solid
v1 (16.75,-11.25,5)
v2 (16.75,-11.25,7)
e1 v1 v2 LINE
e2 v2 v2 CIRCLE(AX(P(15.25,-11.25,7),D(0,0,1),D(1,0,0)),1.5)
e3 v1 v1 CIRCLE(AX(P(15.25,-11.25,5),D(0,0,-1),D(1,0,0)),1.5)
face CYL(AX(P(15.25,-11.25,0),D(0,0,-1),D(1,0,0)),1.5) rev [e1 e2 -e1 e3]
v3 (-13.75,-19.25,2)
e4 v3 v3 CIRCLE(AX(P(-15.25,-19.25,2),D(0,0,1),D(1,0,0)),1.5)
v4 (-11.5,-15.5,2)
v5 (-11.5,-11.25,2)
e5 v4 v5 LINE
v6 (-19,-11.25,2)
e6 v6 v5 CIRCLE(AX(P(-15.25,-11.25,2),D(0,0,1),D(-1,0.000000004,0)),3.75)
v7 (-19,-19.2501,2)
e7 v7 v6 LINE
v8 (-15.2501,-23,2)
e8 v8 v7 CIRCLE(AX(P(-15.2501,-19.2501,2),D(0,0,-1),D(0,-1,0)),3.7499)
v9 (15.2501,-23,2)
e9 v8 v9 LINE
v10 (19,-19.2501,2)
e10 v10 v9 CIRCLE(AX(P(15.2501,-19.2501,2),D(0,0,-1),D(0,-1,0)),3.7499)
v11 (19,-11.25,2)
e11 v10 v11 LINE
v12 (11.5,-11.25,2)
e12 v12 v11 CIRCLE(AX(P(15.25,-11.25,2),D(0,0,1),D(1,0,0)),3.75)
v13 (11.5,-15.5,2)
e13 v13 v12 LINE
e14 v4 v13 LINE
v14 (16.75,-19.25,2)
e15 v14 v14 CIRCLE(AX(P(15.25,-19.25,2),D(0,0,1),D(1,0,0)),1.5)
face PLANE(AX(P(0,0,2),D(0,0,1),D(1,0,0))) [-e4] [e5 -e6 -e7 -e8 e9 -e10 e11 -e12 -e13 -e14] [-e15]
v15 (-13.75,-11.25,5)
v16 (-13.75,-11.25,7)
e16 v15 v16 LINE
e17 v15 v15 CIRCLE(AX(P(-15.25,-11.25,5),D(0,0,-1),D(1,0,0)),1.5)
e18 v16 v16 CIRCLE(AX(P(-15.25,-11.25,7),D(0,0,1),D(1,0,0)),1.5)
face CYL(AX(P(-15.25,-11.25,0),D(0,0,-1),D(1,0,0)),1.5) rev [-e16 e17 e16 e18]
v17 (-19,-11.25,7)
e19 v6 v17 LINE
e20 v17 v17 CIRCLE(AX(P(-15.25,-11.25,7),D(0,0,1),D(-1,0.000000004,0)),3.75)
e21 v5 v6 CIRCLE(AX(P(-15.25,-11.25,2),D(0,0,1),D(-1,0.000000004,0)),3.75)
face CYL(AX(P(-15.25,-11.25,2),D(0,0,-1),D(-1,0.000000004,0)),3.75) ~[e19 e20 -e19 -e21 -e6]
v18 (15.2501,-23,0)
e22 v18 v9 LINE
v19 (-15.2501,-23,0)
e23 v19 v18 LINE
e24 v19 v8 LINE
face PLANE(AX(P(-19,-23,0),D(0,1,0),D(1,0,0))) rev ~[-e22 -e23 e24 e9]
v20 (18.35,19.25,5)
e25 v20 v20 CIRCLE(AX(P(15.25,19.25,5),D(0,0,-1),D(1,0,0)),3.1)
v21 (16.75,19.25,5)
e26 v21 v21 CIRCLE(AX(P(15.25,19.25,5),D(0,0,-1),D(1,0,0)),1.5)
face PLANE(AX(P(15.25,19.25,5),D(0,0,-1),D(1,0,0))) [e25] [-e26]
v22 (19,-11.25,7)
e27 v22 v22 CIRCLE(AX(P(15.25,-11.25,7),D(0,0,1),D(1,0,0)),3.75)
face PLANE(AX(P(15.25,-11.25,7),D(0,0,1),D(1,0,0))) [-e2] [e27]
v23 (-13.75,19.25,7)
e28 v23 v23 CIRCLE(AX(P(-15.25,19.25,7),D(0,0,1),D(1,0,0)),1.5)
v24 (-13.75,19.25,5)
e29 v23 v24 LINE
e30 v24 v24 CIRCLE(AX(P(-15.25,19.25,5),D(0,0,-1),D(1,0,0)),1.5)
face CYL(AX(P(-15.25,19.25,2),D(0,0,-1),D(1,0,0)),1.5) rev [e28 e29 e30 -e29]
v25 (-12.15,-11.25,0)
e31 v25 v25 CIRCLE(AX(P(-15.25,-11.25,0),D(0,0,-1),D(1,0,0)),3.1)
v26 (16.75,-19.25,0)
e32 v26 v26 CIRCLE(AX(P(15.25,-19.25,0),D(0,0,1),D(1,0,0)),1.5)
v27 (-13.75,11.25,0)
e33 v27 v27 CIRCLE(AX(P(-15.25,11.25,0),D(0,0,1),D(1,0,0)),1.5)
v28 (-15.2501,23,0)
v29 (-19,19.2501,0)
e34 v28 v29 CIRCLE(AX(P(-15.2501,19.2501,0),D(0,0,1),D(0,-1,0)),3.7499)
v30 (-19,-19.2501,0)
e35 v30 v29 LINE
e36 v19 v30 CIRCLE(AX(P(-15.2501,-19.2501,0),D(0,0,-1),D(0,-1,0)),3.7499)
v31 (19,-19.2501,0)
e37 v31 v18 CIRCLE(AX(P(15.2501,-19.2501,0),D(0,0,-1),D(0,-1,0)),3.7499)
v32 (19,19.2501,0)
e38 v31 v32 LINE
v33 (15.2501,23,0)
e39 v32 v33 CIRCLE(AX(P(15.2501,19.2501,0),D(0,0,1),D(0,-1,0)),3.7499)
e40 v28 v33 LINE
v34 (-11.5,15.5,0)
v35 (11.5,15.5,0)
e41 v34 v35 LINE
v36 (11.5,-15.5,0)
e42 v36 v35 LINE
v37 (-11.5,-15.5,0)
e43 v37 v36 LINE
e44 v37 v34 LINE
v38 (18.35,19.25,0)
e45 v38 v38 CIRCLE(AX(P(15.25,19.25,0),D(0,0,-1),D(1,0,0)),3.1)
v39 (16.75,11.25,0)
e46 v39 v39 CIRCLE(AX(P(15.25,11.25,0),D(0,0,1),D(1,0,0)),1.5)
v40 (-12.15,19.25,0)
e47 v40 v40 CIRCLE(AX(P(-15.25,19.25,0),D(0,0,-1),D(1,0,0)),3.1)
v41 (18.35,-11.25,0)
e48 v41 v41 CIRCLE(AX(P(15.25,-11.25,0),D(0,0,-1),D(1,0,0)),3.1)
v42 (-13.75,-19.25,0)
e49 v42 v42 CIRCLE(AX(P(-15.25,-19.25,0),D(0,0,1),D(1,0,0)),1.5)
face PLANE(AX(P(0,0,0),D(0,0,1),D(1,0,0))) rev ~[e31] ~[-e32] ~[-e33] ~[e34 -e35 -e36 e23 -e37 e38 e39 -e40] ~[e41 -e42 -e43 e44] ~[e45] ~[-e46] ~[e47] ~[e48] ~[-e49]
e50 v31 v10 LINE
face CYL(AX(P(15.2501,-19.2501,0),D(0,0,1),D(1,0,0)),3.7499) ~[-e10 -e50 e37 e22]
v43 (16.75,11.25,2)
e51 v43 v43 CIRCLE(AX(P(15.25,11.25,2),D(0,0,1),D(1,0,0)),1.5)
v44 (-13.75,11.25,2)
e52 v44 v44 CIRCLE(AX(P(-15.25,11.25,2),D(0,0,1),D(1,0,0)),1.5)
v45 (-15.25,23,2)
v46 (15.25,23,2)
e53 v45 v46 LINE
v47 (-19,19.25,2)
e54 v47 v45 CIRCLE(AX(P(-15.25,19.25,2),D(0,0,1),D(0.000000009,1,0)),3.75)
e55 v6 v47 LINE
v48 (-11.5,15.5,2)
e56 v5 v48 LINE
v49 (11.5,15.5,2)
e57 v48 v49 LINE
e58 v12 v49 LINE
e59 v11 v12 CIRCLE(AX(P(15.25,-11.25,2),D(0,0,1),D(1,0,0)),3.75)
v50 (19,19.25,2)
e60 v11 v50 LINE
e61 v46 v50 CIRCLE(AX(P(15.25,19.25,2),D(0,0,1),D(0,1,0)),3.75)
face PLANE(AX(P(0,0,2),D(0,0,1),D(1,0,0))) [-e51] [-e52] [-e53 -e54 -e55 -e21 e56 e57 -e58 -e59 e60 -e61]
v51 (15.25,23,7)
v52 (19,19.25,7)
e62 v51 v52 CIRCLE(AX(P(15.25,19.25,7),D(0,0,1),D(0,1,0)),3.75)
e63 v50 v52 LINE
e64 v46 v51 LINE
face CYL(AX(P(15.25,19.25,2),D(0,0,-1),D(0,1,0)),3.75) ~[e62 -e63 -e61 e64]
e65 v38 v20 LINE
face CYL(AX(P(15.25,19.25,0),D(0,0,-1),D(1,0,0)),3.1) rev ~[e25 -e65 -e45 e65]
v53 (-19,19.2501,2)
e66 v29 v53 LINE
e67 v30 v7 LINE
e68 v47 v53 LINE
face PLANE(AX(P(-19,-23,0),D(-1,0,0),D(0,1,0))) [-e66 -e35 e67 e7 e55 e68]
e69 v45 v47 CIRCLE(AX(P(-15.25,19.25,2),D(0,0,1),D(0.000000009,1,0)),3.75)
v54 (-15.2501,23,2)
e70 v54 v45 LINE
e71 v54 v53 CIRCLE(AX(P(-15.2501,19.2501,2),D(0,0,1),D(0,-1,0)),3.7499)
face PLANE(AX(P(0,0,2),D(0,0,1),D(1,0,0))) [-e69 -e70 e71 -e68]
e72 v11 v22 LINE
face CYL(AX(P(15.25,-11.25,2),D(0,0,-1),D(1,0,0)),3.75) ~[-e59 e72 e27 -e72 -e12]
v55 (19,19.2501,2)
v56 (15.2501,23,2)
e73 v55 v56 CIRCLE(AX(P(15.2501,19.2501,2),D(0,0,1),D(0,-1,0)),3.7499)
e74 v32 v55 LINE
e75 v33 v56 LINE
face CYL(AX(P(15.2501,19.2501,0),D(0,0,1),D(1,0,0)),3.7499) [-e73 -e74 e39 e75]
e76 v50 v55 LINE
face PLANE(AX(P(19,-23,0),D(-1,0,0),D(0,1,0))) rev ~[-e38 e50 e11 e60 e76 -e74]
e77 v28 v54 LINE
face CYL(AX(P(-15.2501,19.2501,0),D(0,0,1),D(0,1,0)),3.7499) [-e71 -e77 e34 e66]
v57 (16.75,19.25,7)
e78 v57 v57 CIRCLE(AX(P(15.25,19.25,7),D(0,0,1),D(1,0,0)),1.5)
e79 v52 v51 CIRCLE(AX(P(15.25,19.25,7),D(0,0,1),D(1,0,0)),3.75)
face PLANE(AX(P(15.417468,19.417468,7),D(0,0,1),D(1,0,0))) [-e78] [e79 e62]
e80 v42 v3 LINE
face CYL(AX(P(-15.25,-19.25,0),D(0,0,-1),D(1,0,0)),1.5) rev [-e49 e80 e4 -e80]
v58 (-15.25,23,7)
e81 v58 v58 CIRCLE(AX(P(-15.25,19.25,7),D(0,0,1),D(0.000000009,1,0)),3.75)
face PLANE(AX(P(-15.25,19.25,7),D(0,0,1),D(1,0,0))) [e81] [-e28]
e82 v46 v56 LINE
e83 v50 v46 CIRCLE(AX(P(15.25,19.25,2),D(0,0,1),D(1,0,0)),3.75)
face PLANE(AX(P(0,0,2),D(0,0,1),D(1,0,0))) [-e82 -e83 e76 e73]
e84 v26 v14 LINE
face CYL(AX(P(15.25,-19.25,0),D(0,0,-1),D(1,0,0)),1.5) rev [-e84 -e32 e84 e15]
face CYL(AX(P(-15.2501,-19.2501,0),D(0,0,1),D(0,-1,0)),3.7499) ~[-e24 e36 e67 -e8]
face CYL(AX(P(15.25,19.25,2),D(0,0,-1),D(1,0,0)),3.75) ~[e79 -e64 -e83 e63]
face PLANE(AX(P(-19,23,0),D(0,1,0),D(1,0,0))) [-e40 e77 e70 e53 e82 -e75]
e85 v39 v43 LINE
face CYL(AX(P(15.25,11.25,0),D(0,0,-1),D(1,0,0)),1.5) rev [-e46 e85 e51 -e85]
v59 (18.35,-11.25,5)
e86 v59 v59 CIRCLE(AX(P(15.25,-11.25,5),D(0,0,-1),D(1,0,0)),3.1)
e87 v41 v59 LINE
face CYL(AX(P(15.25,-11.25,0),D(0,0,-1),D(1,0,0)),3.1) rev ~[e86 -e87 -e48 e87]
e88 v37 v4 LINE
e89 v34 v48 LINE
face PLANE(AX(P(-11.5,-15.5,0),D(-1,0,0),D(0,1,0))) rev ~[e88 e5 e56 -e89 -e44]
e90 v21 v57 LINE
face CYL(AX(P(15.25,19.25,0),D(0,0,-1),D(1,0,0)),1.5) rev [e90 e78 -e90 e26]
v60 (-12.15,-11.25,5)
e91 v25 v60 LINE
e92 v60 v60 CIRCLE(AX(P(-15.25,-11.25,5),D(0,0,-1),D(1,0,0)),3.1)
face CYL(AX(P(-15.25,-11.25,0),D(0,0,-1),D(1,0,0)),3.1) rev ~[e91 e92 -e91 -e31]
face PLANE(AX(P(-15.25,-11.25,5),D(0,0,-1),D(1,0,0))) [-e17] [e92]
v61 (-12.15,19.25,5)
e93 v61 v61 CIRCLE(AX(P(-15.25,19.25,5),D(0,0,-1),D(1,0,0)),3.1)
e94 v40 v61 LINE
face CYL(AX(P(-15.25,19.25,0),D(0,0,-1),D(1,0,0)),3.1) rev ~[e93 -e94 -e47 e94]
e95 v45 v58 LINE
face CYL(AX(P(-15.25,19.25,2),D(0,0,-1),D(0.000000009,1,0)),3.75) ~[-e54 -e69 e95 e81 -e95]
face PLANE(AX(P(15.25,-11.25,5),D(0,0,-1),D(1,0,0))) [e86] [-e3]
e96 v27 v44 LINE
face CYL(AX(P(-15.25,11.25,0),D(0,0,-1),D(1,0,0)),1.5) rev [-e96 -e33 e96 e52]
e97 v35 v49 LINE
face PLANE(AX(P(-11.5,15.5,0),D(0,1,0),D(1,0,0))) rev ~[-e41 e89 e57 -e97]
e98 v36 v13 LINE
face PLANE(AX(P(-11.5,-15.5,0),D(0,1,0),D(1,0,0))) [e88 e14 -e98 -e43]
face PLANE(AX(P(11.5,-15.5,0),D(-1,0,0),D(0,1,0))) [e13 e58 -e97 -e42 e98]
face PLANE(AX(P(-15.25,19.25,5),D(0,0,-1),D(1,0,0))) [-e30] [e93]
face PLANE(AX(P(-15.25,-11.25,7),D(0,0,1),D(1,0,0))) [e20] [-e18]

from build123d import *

# Parameters (mm, degrees)
F3_W     = 38
F3_H     = 46
F3_R     = 1.5
F3_W_2   = 23
F3_H_2   = 31
F4_DEPTH = 2
F5_R     = 1.5
F6_DEPTH = 5
F7_R     = 3.7499
F8_R     = 3.1
F9_DEPTH = 5


# Not quite as in the source:
# - a fillet or chamfer is up to 0.001 mm smaller than in the source, because OpenCascade refuses the exact size


with BuildPart() as f4:
    # F3 (on Top) → F4 (new body)
    with BuildSketch(Plane.XY):
        Rectangle(F3_W, F3_H)
        with Locations((-15.25, -19.25)):
            Circle(F3_R, mode=Mode.SUBTRACT)
        with Locations((-15.25, -11.25)):
            Circle(F3_R, mode=Mode.SUBTRACT)
        with Locations((15.25, -19.25)):
            Circle(F3_R, mode=Mode.SUBTRACT)
        with Locations((15.25, -11.25)):
            Circle(F3_R, mode=Mode.SUBTRACT)
        with Locations((-15.25, 11.25)):
            Circle(F3_R, mode=Mode.SUBTRACT)
        with Locations((-15.25, 19.25)):
            Circle(F3_R, mode=Mode.SUBTRACT)
        Rectangle(F3_W_2, F3_H_2, mode=Mode.SUBTRACT)
        with Locations((15.25, 11.25)):
            Circle(F3_R, mode=Mode.SUBTRACT)
        with Locations((15.25, 19.25)):
            Circle(F3_R, mode=Mode.SUBTRACT)
    extrude(amount=F4_DEPTH)

    # F5 (on face) → F6 (join)
    with BuildSketch(Plane.XY.offset(2)):
        with BuildLine():
            ThreePointArc((-19, 19.25), (-15.25, 15.5), (-11.5, 19.25))
            ThreePointArc((-11.5, 19.25), (-12.598349559, 21.9016504179), (-15.2499999673, 23))
            ThreePointArc((-15.2499999673, 23), (-17.9016504179, 21.901650441), (-19, 19.25))
        make_face()
        with Locations((-15.25, 19.25)):
            Circle(F5_R, mode=Mode.SUBTRACT)
        with BuildLine():
            ThreePointArc((19, 19.25), (17.9016504294, 21.9016504294), (15.25, 23))
            ThreePointArc((15.25, 23), (12.5983495706, 16.5983495706), (19, 19.25))
        make_face()
        with Locations((15.25, 19.25)):
            Circle(F5_R, mode=Mode.SUBTRACT)
        with BuildLine():
            ThreePointArc((11.5, -11.25), (15.25, -15), (19, -11.25))
            ThreePointArc((19, -11.25), (15.25, -7.5), (11.5, -11.25))
        make_face()
        with Locations((15.25, -11.25)):
            Circle(F5_R, mode=Mode.SUBTRACT)
        with BuildLine():
            ThreePointArc((-11.5, -11.25), (-15.2499999923, -7.5), (-19, -11.2499999846))
            ThreePointArc((-19, -11.2499999846), (-15.2500000077, -15), (-11.5, -11.25))
        make_face()
        with Locations((-15.25, -11.25)):
            Circle(F5_R, mode=Mode.SUBTRACT)
    extrude(amount=F6_DEPTH)

    # F7 (radius 3.75 in the source; OpenCascade refuses exactly that, so slightly less here)
    f7_edges = [f4.edges().sort_by_distance(p)[0] for p in [
        (-19, 23, 1),
        (-19, -23, 1),
        (19, -23, 1),
        (19, 23, 1),
    ]]
    fillet(f7_edges, radius=F7_R)

    # F8 (on face) → F9 (cut)
    with BuildSketch(Plane(origin=(0, 0, 0), x_dir=(1, 0, 0), z_dir=(0, 0, -1))):
        with Locations((-15.25, 11.25)):
            Circle(F8_R)
        with Locations((15.25, 11.25)):
            Circle(F8_R)
        with Locations((15.25, -19.25)):
            Circle(F8_R)
        with Locations((-15.25, -19.25)):
            Circle(F8_R)
    extrude(amount=-F9_DEPTH, mode=Mode.SUBTRACT)


solid = f4.part
